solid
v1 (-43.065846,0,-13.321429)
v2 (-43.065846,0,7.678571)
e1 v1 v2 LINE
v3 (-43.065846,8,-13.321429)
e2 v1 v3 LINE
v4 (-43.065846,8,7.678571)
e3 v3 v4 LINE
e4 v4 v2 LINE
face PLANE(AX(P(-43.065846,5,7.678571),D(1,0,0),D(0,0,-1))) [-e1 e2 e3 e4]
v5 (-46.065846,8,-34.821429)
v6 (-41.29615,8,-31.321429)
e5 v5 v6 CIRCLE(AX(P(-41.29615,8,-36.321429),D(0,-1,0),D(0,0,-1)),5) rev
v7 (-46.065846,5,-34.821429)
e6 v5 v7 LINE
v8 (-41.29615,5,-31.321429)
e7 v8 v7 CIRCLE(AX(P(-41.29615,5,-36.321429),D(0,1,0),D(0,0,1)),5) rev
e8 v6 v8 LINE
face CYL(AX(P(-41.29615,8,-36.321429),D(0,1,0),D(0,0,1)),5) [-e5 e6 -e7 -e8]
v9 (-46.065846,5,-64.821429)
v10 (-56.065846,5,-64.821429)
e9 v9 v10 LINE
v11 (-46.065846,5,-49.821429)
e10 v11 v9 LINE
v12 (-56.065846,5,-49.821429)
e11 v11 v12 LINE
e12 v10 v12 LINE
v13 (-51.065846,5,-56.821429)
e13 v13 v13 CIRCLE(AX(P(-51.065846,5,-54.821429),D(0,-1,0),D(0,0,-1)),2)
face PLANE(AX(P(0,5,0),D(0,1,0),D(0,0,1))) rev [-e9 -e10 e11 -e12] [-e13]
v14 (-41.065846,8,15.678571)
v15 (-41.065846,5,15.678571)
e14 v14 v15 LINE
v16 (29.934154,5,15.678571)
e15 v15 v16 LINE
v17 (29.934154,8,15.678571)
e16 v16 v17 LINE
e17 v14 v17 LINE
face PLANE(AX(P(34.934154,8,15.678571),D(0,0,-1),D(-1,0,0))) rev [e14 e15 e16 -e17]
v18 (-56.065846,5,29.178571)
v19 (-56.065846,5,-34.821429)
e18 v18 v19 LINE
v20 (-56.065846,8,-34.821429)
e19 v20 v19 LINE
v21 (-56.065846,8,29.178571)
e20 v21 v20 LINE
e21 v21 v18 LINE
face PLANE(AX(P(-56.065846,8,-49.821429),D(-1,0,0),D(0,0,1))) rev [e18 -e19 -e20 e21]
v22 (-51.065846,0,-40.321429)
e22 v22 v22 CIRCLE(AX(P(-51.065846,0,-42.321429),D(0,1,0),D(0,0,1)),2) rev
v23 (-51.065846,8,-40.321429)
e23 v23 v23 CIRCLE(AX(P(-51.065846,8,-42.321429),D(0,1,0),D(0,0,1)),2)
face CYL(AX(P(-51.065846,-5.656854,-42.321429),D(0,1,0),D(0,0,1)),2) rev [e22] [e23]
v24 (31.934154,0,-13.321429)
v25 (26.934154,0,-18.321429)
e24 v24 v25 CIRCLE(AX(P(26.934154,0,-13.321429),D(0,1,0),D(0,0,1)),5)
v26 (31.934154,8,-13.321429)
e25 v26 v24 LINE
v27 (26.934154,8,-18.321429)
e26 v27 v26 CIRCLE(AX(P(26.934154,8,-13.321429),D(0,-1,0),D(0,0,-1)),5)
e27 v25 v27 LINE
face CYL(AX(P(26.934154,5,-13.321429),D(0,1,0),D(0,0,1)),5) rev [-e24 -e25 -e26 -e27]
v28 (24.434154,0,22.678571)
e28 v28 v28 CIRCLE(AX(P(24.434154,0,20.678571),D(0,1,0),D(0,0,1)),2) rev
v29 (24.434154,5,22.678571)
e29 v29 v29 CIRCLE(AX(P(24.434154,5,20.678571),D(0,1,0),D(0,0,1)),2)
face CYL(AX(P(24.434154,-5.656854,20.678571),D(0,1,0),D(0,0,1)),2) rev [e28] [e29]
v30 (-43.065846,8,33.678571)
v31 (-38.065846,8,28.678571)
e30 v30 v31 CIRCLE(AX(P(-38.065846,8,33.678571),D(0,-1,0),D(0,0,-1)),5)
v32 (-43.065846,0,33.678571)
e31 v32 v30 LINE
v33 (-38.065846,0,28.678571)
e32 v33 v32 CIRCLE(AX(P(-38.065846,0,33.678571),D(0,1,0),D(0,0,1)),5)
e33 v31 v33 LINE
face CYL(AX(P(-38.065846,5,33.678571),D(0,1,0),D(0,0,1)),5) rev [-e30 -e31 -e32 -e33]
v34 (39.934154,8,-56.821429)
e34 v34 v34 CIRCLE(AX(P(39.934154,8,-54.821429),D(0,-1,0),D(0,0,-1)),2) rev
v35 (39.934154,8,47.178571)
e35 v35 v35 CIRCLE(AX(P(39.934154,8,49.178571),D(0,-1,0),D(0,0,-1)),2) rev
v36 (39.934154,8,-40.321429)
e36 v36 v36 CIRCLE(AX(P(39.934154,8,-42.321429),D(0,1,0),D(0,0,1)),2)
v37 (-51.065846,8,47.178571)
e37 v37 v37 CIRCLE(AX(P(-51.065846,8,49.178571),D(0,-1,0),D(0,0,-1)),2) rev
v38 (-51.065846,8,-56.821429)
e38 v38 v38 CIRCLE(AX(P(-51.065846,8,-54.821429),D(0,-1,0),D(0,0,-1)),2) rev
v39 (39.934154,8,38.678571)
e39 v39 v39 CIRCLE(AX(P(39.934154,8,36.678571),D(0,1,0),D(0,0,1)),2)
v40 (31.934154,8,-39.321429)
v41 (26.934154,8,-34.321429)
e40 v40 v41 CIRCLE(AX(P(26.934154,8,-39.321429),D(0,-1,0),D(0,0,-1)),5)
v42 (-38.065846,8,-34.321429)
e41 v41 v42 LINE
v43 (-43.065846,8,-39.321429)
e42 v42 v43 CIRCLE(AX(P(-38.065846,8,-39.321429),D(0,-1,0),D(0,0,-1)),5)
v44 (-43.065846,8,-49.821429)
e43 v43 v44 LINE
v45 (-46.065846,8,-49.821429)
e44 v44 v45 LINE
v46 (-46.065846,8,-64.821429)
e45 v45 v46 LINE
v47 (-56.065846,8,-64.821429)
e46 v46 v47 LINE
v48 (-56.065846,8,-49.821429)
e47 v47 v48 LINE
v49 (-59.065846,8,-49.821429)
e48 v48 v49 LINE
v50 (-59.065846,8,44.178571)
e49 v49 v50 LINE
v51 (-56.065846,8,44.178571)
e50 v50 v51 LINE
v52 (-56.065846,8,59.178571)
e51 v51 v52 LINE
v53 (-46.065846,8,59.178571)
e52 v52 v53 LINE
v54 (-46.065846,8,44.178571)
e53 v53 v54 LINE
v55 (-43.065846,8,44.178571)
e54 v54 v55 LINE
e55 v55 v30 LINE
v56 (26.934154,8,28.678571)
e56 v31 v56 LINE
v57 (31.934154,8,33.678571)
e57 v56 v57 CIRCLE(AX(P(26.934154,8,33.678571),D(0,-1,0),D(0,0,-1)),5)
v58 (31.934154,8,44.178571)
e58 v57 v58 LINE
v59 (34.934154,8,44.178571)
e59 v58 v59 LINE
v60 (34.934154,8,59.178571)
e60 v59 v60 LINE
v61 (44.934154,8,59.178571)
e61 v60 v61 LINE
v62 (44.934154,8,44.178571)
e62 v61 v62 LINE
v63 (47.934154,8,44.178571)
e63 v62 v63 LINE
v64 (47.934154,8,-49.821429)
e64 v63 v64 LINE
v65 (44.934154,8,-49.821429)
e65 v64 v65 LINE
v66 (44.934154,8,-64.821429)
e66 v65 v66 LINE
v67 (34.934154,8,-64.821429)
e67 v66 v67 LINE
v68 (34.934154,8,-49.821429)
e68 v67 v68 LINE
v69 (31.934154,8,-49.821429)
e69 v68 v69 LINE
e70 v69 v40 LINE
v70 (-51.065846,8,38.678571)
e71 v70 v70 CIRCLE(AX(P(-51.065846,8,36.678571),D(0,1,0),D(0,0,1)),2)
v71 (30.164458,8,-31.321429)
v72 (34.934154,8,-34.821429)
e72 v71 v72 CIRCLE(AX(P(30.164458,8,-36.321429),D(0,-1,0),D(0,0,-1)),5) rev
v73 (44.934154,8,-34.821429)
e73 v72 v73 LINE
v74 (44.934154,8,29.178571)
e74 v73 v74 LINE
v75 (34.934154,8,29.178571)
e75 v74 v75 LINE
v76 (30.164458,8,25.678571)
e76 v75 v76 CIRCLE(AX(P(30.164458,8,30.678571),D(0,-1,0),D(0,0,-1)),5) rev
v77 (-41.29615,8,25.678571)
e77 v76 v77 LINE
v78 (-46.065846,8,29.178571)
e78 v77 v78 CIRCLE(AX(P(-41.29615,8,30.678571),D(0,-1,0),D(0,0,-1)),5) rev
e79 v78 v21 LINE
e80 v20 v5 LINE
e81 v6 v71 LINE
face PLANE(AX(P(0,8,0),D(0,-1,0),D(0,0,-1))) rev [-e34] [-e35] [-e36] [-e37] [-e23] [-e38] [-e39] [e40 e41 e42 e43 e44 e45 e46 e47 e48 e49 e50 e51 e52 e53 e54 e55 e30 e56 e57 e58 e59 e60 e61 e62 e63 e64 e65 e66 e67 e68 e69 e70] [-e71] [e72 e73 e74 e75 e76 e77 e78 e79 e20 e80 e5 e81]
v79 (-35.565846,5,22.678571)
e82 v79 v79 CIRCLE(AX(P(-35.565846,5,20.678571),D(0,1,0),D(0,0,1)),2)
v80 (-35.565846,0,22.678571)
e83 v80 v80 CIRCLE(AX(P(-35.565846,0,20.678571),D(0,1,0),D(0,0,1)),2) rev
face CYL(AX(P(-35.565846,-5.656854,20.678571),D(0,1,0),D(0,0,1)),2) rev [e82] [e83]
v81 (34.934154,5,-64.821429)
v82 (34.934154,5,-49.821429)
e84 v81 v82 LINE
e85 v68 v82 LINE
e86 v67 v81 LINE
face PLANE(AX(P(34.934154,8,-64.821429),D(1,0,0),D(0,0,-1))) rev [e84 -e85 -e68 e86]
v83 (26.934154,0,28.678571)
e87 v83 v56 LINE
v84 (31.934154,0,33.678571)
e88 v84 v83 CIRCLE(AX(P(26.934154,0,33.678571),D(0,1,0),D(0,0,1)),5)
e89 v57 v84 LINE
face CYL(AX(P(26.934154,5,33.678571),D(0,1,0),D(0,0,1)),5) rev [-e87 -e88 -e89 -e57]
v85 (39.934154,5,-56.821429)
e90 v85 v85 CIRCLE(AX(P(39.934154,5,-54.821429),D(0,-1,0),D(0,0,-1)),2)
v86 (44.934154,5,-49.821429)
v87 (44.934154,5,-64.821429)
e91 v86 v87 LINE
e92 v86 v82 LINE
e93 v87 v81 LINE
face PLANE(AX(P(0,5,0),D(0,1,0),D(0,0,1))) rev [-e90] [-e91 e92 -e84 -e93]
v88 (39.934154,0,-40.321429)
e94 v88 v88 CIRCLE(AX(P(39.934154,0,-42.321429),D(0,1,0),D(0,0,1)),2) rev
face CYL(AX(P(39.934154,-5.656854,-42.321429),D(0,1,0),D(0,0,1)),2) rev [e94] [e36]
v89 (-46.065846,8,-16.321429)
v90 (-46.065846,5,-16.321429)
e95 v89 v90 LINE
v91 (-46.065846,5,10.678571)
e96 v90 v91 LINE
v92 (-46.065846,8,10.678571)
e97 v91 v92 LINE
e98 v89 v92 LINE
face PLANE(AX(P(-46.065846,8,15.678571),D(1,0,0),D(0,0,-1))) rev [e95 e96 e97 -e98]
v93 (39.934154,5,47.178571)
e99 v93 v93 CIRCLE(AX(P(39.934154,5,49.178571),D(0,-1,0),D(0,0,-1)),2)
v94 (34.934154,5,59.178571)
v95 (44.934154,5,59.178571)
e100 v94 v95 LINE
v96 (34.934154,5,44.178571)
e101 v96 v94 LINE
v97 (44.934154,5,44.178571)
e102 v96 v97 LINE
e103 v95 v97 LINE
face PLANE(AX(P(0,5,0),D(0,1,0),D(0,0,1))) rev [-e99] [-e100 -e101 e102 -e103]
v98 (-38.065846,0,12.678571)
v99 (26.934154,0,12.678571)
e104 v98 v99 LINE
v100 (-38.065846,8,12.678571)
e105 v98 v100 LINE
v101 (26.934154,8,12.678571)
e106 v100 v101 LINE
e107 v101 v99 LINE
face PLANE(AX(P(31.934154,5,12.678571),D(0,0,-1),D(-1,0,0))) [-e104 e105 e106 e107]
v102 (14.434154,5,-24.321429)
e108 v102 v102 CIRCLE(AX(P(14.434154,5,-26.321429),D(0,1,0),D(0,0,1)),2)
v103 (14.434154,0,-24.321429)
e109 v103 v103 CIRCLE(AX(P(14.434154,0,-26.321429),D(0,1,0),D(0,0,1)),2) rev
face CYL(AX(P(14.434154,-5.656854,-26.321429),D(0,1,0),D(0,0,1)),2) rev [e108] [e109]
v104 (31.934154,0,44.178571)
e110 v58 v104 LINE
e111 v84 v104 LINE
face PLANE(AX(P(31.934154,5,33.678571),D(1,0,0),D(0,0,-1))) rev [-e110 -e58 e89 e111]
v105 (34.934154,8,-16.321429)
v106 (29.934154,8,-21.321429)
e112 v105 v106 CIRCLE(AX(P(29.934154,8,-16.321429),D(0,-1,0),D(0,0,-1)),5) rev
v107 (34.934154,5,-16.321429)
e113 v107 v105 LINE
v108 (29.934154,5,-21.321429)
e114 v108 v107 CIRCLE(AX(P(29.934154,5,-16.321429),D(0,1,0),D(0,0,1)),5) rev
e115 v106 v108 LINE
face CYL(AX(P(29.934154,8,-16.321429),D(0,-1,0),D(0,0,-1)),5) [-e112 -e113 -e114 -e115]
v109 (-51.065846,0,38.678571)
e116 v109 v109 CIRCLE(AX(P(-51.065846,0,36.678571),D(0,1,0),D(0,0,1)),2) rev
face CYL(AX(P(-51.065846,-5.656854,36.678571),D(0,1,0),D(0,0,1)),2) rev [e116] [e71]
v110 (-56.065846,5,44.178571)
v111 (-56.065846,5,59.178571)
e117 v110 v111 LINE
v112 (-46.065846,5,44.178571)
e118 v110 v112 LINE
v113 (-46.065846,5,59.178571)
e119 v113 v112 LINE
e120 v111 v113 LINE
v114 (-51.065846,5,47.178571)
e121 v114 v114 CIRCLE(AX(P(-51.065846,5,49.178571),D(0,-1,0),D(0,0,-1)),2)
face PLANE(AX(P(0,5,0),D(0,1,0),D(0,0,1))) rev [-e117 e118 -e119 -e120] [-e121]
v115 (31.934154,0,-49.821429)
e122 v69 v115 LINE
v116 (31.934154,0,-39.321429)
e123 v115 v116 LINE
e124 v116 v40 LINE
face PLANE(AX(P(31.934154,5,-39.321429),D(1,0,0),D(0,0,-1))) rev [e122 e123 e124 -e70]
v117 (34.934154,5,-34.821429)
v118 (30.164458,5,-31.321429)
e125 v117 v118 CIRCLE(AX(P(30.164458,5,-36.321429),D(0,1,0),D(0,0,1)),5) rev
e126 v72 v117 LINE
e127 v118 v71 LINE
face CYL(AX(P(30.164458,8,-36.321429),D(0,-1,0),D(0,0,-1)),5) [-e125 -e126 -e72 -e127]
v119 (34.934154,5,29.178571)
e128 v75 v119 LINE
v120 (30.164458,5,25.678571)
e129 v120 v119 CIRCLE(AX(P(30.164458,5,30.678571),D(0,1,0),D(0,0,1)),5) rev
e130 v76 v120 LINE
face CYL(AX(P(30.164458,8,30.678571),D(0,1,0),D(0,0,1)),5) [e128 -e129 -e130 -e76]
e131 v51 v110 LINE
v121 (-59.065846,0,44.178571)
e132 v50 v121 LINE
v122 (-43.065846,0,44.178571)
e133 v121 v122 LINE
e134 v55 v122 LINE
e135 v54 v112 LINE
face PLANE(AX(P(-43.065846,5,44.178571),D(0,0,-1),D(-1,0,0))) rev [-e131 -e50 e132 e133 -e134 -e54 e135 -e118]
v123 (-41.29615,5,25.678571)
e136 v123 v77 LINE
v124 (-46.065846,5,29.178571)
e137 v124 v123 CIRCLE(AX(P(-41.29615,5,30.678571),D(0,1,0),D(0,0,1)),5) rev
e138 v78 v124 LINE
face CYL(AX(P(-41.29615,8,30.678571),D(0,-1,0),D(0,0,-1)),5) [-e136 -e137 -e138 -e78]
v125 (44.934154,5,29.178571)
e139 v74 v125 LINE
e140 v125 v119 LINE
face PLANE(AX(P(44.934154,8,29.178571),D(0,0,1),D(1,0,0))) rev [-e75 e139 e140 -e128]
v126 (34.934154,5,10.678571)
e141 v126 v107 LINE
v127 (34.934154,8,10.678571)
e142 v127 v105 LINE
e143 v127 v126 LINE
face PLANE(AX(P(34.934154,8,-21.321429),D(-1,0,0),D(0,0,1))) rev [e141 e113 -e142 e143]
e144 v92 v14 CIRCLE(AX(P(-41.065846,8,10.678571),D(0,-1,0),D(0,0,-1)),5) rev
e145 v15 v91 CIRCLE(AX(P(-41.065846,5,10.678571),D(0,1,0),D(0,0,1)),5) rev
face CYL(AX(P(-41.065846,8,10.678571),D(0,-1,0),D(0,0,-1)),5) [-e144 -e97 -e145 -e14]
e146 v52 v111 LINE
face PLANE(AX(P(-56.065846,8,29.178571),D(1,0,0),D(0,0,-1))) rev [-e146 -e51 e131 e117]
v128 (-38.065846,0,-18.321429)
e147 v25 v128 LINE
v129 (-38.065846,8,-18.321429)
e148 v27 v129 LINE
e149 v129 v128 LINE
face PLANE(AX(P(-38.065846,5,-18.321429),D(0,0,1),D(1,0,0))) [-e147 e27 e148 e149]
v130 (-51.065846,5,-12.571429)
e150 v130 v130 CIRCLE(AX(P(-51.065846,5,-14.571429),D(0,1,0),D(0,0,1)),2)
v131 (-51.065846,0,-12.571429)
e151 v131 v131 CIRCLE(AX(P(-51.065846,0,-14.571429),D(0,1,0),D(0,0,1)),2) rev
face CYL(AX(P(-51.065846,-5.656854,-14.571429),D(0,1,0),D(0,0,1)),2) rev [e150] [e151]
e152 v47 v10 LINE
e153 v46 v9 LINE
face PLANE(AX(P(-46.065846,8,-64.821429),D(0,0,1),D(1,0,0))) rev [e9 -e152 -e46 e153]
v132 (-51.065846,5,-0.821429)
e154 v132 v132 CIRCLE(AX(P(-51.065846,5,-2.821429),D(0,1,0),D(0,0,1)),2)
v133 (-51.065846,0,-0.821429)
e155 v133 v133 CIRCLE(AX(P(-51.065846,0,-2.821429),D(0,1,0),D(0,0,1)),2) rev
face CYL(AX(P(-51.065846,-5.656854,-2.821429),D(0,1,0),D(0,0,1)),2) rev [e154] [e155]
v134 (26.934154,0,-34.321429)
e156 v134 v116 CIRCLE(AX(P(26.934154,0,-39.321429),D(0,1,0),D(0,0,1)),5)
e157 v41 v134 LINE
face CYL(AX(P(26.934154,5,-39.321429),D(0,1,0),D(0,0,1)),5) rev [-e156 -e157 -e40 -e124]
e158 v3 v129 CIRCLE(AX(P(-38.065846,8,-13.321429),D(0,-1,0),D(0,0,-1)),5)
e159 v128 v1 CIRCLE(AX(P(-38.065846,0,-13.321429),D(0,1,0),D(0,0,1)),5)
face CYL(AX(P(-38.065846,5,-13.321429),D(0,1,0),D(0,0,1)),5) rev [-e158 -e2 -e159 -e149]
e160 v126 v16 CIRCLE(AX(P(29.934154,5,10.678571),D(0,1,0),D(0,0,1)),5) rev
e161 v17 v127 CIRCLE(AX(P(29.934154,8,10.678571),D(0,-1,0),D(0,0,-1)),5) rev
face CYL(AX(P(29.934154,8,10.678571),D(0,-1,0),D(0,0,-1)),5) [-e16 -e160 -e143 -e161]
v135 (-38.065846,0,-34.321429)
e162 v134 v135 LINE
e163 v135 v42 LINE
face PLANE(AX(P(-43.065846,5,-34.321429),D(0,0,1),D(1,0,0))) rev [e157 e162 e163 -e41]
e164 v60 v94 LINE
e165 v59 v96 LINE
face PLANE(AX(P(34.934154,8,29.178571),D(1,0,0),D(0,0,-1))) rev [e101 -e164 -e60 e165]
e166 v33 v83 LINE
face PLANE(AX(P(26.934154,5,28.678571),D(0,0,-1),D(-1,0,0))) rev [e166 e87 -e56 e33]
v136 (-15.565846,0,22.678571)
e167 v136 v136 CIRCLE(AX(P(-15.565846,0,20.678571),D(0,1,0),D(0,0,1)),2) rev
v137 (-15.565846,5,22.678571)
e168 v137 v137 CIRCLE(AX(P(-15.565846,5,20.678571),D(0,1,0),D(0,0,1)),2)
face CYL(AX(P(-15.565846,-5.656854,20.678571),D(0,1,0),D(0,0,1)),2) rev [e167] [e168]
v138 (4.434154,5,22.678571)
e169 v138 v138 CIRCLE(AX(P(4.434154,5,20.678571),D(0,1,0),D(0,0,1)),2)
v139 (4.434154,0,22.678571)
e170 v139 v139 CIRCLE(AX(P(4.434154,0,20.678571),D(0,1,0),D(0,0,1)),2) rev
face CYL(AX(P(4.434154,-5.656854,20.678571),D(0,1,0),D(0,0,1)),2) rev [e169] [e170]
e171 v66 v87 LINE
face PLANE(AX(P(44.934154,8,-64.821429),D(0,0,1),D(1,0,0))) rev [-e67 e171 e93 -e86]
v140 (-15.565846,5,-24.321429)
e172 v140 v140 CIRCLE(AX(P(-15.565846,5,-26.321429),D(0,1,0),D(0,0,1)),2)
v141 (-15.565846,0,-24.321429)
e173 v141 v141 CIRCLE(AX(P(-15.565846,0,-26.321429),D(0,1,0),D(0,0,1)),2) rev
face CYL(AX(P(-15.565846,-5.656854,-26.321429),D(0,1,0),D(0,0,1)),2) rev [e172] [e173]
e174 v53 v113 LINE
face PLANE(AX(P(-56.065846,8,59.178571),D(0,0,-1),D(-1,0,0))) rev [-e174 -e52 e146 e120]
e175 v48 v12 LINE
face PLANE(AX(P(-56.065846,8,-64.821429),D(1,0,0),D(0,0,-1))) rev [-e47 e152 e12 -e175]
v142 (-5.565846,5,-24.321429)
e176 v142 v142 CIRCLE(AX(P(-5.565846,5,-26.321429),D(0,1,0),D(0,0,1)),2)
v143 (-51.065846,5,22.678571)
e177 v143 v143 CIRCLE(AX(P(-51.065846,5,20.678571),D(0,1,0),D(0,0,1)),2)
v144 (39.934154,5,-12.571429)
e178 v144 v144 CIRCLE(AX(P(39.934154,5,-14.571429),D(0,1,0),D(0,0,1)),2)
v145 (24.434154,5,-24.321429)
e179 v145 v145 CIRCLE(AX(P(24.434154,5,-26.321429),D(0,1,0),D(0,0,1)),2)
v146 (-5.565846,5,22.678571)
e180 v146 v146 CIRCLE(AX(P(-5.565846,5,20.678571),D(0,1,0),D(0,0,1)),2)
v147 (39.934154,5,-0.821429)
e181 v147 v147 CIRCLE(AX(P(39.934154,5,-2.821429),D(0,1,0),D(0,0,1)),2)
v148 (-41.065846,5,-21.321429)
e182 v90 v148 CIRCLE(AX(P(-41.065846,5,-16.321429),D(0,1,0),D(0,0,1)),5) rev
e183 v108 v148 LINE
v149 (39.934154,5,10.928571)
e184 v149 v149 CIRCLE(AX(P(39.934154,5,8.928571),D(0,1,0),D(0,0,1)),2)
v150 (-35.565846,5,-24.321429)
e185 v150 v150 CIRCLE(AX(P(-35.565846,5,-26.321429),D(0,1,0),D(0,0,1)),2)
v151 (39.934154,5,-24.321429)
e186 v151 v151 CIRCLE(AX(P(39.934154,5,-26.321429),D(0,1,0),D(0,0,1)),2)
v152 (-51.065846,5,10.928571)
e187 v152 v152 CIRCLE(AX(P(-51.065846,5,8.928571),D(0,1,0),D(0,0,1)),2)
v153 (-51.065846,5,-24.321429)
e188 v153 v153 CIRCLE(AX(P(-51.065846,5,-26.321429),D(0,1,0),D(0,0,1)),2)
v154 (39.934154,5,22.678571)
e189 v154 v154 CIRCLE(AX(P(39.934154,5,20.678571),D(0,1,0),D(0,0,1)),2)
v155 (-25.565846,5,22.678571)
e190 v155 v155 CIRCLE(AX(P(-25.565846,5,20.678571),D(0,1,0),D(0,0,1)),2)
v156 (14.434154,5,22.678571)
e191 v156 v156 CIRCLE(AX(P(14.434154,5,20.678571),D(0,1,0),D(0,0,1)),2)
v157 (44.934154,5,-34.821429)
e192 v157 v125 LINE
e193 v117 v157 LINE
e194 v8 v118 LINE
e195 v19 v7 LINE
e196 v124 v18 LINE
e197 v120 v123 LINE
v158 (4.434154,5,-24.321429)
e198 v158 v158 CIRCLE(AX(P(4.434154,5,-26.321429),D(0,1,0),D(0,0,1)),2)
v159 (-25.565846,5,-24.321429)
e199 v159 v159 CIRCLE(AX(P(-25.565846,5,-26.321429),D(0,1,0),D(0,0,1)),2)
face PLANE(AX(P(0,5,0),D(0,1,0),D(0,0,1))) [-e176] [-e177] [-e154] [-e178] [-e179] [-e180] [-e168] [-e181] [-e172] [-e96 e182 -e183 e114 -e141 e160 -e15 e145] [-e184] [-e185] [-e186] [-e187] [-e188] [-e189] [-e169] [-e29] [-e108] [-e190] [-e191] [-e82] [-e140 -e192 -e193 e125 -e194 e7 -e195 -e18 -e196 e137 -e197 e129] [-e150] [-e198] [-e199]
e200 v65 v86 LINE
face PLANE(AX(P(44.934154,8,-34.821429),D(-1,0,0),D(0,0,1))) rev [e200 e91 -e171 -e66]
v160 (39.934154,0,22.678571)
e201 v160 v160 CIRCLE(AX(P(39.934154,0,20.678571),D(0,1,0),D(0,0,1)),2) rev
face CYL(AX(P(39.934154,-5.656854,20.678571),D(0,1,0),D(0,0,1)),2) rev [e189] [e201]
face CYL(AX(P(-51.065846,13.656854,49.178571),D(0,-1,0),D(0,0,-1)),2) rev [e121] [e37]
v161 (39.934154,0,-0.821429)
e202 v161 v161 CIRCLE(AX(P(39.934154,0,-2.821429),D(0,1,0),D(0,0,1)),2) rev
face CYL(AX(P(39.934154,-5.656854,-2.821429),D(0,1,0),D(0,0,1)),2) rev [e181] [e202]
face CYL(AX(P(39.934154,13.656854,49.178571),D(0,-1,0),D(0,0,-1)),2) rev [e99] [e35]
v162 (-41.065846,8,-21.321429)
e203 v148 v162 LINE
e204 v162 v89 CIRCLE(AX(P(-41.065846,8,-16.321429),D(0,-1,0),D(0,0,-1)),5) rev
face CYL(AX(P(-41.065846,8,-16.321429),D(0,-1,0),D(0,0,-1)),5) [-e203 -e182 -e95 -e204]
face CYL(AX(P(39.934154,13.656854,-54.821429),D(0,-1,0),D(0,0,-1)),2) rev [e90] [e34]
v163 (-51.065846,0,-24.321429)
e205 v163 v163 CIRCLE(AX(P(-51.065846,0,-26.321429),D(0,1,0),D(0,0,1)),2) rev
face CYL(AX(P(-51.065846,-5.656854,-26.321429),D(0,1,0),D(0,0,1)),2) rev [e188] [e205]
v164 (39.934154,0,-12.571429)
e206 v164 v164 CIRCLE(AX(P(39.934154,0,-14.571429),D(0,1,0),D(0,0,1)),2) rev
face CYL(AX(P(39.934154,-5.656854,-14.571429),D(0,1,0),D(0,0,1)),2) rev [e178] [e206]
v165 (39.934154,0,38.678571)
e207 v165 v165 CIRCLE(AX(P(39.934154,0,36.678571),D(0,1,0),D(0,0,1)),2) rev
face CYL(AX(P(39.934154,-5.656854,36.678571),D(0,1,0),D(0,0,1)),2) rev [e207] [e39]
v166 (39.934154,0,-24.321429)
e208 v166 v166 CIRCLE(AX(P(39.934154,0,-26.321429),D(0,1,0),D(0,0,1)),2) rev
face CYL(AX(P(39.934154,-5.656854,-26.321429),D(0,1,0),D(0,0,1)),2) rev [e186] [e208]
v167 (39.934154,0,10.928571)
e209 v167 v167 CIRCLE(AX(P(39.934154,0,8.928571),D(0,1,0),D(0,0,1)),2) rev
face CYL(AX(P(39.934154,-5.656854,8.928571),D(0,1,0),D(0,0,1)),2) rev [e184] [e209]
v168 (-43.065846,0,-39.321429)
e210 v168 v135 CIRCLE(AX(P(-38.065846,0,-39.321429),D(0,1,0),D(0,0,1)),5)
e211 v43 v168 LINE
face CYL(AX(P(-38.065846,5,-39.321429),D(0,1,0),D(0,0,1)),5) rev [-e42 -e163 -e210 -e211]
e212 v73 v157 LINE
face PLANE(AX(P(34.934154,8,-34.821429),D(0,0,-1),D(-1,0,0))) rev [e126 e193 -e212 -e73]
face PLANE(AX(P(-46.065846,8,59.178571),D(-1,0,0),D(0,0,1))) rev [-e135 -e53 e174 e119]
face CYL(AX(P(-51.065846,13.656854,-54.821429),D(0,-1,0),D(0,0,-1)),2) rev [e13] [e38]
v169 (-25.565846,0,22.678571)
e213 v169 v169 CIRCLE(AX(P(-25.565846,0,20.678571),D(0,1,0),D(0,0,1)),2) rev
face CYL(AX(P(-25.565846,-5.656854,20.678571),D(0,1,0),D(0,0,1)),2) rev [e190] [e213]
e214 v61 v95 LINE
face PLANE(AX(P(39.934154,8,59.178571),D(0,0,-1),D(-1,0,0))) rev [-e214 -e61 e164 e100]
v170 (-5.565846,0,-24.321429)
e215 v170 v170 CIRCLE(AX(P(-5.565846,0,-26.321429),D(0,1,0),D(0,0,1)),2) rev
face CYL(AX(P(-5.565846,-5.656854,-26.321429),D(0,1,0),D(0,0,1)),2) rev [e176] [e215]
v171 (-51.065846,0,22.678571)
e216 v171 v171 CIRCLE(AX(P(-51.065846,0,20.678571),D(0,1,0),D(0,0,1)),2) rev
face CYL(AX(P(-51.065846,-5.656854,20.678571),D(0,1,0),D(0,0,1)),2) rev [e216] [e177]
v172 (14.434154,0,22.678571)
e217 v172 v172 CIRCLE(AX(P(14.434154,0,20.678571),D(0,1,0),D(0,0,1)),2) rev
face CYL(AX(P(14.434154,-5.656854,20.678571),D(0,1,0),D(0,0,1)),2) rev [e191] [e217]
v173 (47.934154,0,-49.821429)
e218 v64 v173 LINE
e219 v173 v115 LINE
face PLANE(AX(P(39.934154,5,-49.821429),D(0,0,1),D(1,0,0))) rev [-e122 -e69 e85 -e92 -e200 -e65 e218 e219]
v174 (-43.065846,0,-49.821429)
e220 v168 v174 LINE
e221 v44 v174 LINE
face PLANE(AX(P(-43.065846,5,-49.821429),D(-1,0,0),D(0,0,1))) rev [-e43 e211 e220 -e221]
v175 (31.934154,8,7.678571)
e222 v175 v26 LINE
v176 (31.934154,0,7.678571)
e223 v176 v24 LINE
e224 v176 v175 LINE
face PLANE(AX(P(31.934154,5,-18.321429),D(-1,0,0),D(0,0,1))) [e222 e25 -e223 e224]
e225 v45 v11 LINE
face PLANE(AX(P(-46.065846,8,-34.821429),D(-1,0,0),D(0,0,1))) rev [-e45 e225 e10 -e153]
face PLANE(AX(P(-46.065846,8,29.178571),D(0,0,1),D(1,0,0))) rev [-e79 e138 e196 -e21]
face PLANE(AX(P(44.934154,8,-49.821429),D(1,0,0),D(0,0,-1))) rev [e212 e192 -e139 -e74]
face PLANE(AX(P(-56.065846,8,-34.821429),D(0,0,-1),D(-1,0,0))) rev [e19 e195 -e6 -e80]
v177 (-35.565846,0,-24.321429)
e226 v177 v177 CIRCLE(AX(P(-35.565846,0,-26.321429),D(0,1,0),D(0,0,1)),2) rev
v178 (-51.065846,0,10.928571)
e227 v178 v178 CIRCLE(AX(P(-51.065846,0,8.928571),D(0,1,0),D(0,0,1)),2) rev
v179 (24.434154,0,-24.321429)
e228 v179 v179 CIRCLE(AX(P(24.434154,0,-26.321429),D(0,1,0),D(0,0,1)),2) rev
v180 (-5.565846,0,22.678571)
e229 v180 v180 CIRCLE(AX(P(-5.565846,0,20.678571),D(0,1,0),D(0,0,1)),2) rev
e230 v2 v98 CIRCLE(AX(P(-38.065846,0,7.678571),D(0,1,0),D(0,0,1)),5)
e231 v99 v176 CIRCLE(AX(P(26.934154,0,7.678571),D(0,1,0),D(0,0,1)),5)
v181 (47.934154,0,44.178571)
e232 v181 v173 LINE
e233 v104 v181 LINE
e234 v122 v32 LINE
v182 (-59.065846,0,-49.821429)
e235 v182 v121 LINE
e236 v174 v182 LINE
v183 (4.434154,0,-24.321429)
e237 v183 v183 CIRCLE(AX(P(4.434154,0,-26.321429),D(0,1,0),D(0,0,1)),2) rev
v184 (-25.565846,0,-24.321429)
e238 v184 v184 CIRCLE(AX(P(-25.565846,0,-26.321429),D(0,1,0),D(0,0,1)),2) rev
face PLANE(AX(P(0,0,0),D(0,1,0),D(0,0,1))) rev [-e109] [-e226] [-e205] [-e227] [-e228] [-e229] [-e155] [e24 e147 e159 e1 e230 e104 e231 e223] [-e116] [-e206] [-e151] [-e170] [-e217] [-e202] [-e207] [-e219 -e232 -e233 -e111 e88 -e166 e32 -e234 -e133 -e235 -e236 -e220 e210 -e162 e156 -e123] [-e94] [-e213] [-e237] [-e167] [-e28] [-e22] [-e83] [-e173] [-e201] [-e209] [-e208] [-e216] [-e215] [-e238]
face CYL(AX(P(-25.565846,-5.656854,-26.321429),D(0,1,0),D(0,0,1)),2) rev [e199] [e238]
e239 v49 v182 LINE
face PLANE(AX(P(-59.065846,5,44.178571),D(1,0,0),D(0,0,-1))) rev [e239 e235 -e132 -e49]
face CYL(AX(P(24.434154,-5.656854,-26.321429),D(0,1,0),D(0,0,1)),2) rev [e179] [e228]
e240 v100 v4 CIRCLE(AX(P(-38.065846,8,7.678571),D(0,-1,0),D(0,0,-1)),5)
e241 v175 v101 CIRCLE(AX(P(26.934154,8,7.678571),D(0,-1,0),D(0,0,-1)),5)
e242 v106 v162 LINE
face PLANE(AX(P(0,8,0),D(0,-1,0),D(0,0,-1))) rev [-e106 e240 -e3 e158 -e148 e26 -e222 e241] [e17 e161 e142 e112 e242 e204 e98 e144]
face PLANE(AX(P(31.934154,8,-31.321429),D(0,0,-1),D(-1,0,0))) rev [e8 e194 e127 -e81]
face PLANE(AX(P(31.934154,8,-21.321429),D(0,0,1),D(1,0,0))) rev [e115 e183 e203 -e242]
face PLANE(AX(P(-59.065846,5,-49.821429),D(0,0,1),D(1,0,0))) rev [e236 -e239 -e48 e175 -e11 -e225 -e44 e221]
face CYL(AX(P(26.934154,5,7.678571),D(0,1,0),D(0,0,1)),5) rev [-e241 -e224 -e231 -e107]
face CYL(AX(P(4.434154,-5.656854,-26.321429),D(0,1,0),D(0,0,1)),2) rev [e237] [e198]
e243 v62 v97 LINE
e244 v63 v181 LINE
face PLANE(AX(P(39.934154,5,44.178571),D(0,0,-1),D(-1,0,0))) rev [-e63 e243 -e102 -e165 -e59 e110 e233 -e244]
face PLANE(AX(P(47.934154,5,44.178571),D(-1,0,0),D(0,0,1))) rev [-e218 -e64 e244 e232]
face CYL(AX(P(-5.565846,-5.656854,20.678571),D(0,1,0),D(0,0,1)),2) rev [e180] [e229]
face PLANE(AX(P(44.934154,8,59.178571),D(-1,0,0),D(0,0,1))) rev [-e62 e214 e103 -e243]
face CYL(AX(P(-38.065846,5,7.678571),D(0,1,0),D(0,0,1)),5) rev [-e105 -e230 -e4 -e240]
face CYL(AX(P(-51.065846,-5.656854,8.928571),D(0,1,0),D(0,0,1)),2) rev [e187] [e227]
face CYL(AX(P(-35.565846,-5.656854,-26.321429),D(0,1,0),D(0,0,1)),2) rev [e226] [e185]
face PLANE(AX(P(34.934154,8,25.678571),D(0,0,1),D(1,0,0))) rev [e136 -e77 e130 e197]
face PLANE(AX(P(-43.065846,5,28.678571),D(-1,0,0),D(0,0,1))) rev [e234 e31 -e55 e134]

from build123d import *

# Parameters (mm, degrees)
BOSS_EXTRUDE2_DEPTH = 5
SKETCH3_W           = 3
SKETCH3_H           = 94
SKETCH3_W_2         = 75
SKETCH3_H_2         = 31
BOSS_EXTRUDE4_DEPTH = 3
BOSS_EXTRUDE5_DEPTH = 3
SKETCH5_R           = 2
CUT_EXTRUDE1_DEPTH  = 5
SKETCH6_R           = 2
CUT_EXTRUDE2_DEPTH  = 3
SKETCH7_R           = 2
CUT_EXTRUDE3_DEPTH  = 8
FILLET1_R           = 5
FILLET2_R           = 5


with BuildPart() as part:
    # Sketch1 → Boss-Extrude2 (new body)
    with BuildSketch(Plane(origin=(0, 0, 0), x_dir=(1, 0, 0), z_dir=(0, 1, 0))):
        Polygon((-51.065846009, -44.178571429), (-59.065846009, -44.178571429), (-59.065846009, 49.821428571), (-51.065846009, 49.821428571), (-43.065846009, 49.821428571), (-43.065846009, 39.321428571), (-43.065846009, 34.321428571), (-38.065846009, 34.321428571), (26.934153991, 34.321428571), (31.934153991, 34.321428571), (31.934153991, 39.321428571), (31.934153991, 49.821428571), (39.934153991, 49.821428571), (47.934153991, 49.821428571), (47.934153991, -44.178571429), (39.934153991, -44.178571429), (31.934153991, -44.178571429), (31.934153991, -33.678571429), (31.934153991, -28.678571429), (26.934153991, -28.678571429), (-38.065846009, -28.678571429), (-43.065846009, -28.678571429), (-43.065846009, -33.678571429), (-43.065846009, -44.178571429), align=None)
        Polygon((-43.065846009, 13.321428571), (-43.065846009, -7.678571429), (-43.065846009, -12.678571429), (-38.065846009, -12.678571429), (26.934153991, -12.678571429), (31.934153991, -12.678571429), (31.934153991, -7.678571429), (31.934153991, 13.321428571), (31.934153991, 18.321428571), (26.934153991, 18.321428571), (-38.065846009, 18.321428571), (-43.065846009, 18.321428571), align=None, mode=Mode.SUBTRACT)
    extrude(amount=BOSS_EXTRUDE2_DEPTH)

    # Sketch3 → Boss-Extrude4 (add)
    # profile 1 of 5: a face of its own
    with BuildSketch(Plane(origin=(0, 5, 0), x_dir=(1, 0, 0), z_dir=(0, 1, 0))):
        with Locations((-57.565846009, 2.821428571)):
            Rectangle(SKETCH3_W, SKETCH3_H)
    # profile 2 of 5: a face of its own
    with BuildSketch(Plane(origin=(0, 5, 0), x_dir=(1, 0, 0), z_dir=(0, 1, 0))):
        with Locations((46.434153991, 2.821428571)):
            Rectangle(SKETCH3_W, SKETCH3_H)
    # profile 3 of 5: a face of its own
    with BuildSketch(Plane(origin=(0, 5, 0), x_dir=(1, 0, 0), z_dir=(0, 1, 0))):
        Polygon((-43.065846009, 49.821428571), (-46.065846009, 49.821428571), (-46.065846009, 34.321428571), (-46.065846009, 31.321428571), (31.934153991, 31.321428571), (34.934153991, 31.321428571), (34.934153991, 49.821428571), (31.934153991, 49.821428571), (31.934153991, 34.321428571), (-43.065846009, 34.321428571), align=None)
    # profile 4 of 5: a face of its own
    with BuildSketch(Plane(origin=(0, 5, 0), x_dir=(1, 0, 0), z_dir=(0, 1, 0))):
        Polygon((34.934153991, 21.321428571), (34.934153991, -12.678571429), (34.934153991, -15.678571429), (-46.065846009, -15.678571429), (-46.065846009, 21.321428571), (31.934153991, 21.321428571), align=None)
        with Locations((-5.565846009, 2.821428571)):
            Rectangle(SKETCH3_W_2, SKETCH3_H_2, mode=Mode.SUBTRACT)
    # profile 5 of 5: a face of its own
    with BuildSketch(Plane(origin=(0, 5, 0), x_dir=(1, 0, 0), z_dir=(0, 1, 0))):
        Polygon((-46.065846009, -44.178571429), (-43.065846009, -44.178571429), (-43.065846009, -28.678571429), (31.934153991, -28.678571429), (31.934153991, -44.178571429), (34.934153991, -44.178571429), (34.934153991, -28.678571429), (34.934153991, -25.678571429), (-46.065846009, -25.678571429), align=None)
    extrude(amount=BOSS_EXTRUDE4_DEPTH)

    # Sketch4 → Boss-Extrude5 (add)
    with BuildSketch(Plane(origin=(0, 5, 0), x_dir=(1, 0, 0), z_dir=(0, 1, 0))):
        Polygon((-46.065846009, -59.178571429), (-46.065846009, -29.178571429), (-56.065846009, -29.178571429), (-56.065846009, -59.178571429), (-51.065846009, -59.178571429), align=None)
        Polygon((39.934153991, -59.178571429), (44.934153991, -59.178571429), (44.934153991, -29.178571429), (34.934153991, -29.178571429), (34.934153991, -59.178571429), align=None)
        Polygon((-46.065846009, 34.821428571), (-46.065846009, 64.821428571), (-56.065846009, 64.821428571), (-56.065846009, 34.821428571), (-51.065846009, 34.821428571), align=None)
        Polygon((44.934153991, 34.821428571), (44.934153991, 64.821428571), (34.934153991, 64.821428571), (34.934153991, 34.821428571), (39.934153991, 34.821428571), align=None)
    extrude(amount=BOSS_EXTRUDE5_DEPTH)

    # Sketch5 → Cut-Extrude1 (cut)
    with BuildSketch(Plane(origin=(0, 5, 0), x_dir=(1, 0, 0), z_dir=(0, 1, 0))):
        with Locations(Location((-51.065846009, 26.321428571, 0), (0, 0, 270))):
            Circle(SKETCH5_R)
        with Locations(Location((39.934153991, 26.321428571, 0), (0, 0, 270))):
            Circle(SKETCH5_R)
        with Locations(Location((39.934153991, -20.678571429, 0), (0, 0, 270))):
            Circle(SKETCH5_R)
        with Locations(Location((-51.065846009, -20.678571429, 0), (0, 0, 270))):
            Circle(SKETCH5_R)
        with Locations(Location((-51.065846009, 2.821428571, 0), (0, 0, 270))):
            Circle(SKETCH5_R)
        with Locations(Location((39.934153991, 2.821428571, 0), (0, 0, 270))):
            Circle(SKETCH5_R)
        with Locations(Location((-51.065846009, 14.571428571, 0), (0, 0, 270))):
            Circle(SKETCH5_R)
        with Locations(Location((-51.065846009, -8.928571429, 0), (0, 0, 270))):
            Circle(SKETCH5_R)
        with Locations(Location((-5.565846009, 26.321428571, 0), (0, 0, 270))):
            Circle(SKETCH5_R)
        with Locations(Location((14.434153991, 26.321428571, 0), (0, 0, 270))):
            Circle(SKETCH5_R)
        with Locations(Location((24.434153991, 26.321428571, 0), (0, 0, 270))):
            Circle(SKETCH5_R)
        with Locations(Location((-25.565846009, 26.321428571, 0), (0, 0, 270))):
            Circle(SKETCH5_R)
        with Locations(Location((4.434153991, 26.321428571, 0), (0, 0, 270))):
            Circle(SKETCH5_R)
        with Locations(Location((-35.565846009, 26.321428571, 0), (0, 0, 270))):
            Circle(SKETCH5_R)
        with Locations(Location((-15.565846009, 26.321428571, 0), (0, 0, 270))):
            Circle(SKETCH5_R)
        with Locations(Location((-5.565846009, -20.678571429, 0), (0, 0, 270))):
            Circle(SKETCH5_R)
        with Locations(Location((14.434153991, -20.678571429, 0), (0, 0, 270))):
            Circle(SKETCH5_R)
        with Locations(Location((24.434153991, -20.678571429, 0), (0, 0, 270))):
            Circle(SKETCH5_R)
        with Locations(Location((-25.565846009, -20.678571429, 0), (0, 0, 270))):
            Circle(SKETCH5_R)
        with Locations(Location((4.434153991, -20.678571429, 0), (0, 0, 270))):
            Circle(SKETCH5_R)
        with Locations(Location((-35.565846009, -20.678571429, 0), (0, 0, 270))):
            Circle(SKETCH5_R)
        with Locations(Location((-15.565846009, -20.678571429, 0), (0, 0, 270))):
            Circle(SKETCH5_R)
        with Locations(Location((39.934153991, 14.571428571, 0), (0, 0, 270))):
            Circle(SKETCH5_R)
        with Locations(Location((39.934153991, -8.928571429, 0), (0, 0, 270))):
            Circle(SKETCH5_R)
    extrude(amount=-CUT_EXTRUDE1_DEPTH, mode=Mode.SUBTRACT)

    # Sketch6 → Cut-Extrude2 (cut)
    with BuildSketch(Plane.XZ.offset(-5)):
        with Locations(Location((39.934153991, -54.821428571, 0), (0, 0, 270))):
            Circle(SKETCH6_R)
        with Locations(Location((-51.065846009, -54.821428571, 0), (0, 0, 270))):
            Circle(SKETCH6_R)
        with Locations(Location((-51.065846009, 49.178571429, 0), (0, 0, 270))):
            Circle(SKETCH6_R)
        with Locations(Location((39.934153991, 49.178571429, 0), (0, 0, 270))):
            Circle(SKETCH6_R)
    extrude(amount=-CUT_EXTRUDE2_DEPTH, mode=Mode.SUBTRACT)

    # Sketch7 → Cut-Extrude3 (cut)
    with BuildSketch(Plane(origin=(0, 8, 0), x_dir=(1, 0, 0), z_dir=(0, 1, 0))):
        with Locations(Location((-51.065846009, 42.321428571, 0), (0, 0, 270))):
            Circle(SKETCH7_R)
        with Locations(Location((39.934153991, 42.321428571, 0), (0, 0, 270))):
            Circle(SKETCH7_R)
        with Locations(Location((-51.065846009, -36.678571429, 0), (0, 0, 270))):
            Circle(SKETCH7_R)
        with Locations(Location((39.934153991, -36.678571429, 0), (0, 0, 270))):
            Circle(SKETCH7_R)
    extrude(amount=-CUT_EXTRUDE3_DEPTH, mode=Mode.SUBTRACT)

    # Fillet1
    fillet1_edges = [part.edges().sort_by_distance(p)[0] for p in [
        (31.934153991, 4, 28.678571429),
        (-43.065846009, 4, 28.678571429),
        (-43.065846009, 4, -34.321428571),
        (31.934153991, 4, -34.321428571),
        (-43.065846009, 4, -18.321428571),
        (-43.065846009, 4, 12.678571429),
        (31.934153991, 4, 12.678571429),
        (31.934153991, 4, -18.321428571),
    ]]
    fillet(fillet1_edges, radius=FILLET1_R)

    # Fillet2
    # the kernel refuses this fillet: 5 mm, written as the material it takes off along each edge
    with BuildSketch(Plane(origin=(-46.065846009, 5, -31.321428571), x_dir=(1, 0, 0), z_dir=(0, 1, 0))) as fillet2_piece_1:
        with BuildLine():
            CenterArc((4.769696007, 5), FILLET2_R, 197.457603124, 72.542396876)
            Line((0, 3.5), (0, 0))
            Line((0, 0), (4.769696007, 0))
        make_face()
    extrude(amount=14.924240018, mode=Mode.SUBTRACT)
    with BuildSketch(Plane(origin=(34.934153991, 5, -31.321428571), x_dir=(0, 0, -1), z_dir=(0, 1, 0))) as fillet2_piece_2:
        with BuildLine():
            CenterArc((5, 4.769696007), FILLET2_R, 180, 72.542396876)
            Line((0, 4.769696007), (0, 0))
            Line((0, 0), (3.5, 0))
        make_face()
    extrude(amount=14.924240018, mode=Mode.SUBTRACT)
    with BuildSketch(Plane(origin=(-46.065846009, 5, 25.678571429), x_dir=(1, 0, 0), z_dir=(0, 1, 0))) as fillet2_piece_3:
        with BuildLine():
            CenterArc((4.769696007, -5), FILLET2_R, 90, 72.542396876)
            Line((0, -3.5), (0, 0))
            Line((0, 0), (4.769696007, 0))
        make_face()
    extrude(amount=14.924240018, mode=Mode.SUBTRACT)
    with BuildSketch(Plane(origin=(34.934153991, 5, 25.678571429), x_dir=(0, 0, 1), z_dir=(0, 1, 0))) as fillet2_piece_4:
        with BuildLine():
            CenterArc((5, -4.769696007), FILLET2_R, 107.457603124, 72.542396876)
            Line((0, -4.769696007), (0, 0))
            Line((0, 0), (3.5, 0))
        make_face()
    extrude(amount=14.924240018, mode=Mode.SUBTRACT)
    with BuildSketch(Plane(origin=(-46.065846009, 5, -21.321428571), x_dir=(0, 0, 1), z_dir=(0, 1, 0)), Plane(origin=(-46.065846009, 5, 15.678571429), x_dir=(1, 0, 0), z_dir=(0, 1, 0))) as fillet2_piece_5:
        with BuildLine():
            CenterArc((FILLET2_R, FILLET2_R), FILLET2_R, 180, 90)
            Line((0, FILLET2_R), (0, 0))
            Line((0, 0), (FILLET2_R, 0))
        make_face()
    extrude(amount=15.5, mode=Mode.SUBTRACT)
    with BuildSketch(Plane(origin=(34.934153991, 5, 15.678571429), x_dir=(-1, 0, 0), z_dir=(0, 1, 0)), Plane(origin=(34.934153991, 5, -21.321428571), x_dir=(0, 0, 1), z_dir=(0, 1, 0))) as fillet2_piece_6:
        with BuildLine():
            CenterArc((FILLET2_R, -FILLET2_R), FILLET2_R, 90, 90)
            Line((0, -FILLET2_R), (0, 0))
            Line((0, 0), (FILLET2_R, 0))
        make_face()
    extrude(amount=15.5, mode=Mode.SUBTRACT)


solid = part.part
